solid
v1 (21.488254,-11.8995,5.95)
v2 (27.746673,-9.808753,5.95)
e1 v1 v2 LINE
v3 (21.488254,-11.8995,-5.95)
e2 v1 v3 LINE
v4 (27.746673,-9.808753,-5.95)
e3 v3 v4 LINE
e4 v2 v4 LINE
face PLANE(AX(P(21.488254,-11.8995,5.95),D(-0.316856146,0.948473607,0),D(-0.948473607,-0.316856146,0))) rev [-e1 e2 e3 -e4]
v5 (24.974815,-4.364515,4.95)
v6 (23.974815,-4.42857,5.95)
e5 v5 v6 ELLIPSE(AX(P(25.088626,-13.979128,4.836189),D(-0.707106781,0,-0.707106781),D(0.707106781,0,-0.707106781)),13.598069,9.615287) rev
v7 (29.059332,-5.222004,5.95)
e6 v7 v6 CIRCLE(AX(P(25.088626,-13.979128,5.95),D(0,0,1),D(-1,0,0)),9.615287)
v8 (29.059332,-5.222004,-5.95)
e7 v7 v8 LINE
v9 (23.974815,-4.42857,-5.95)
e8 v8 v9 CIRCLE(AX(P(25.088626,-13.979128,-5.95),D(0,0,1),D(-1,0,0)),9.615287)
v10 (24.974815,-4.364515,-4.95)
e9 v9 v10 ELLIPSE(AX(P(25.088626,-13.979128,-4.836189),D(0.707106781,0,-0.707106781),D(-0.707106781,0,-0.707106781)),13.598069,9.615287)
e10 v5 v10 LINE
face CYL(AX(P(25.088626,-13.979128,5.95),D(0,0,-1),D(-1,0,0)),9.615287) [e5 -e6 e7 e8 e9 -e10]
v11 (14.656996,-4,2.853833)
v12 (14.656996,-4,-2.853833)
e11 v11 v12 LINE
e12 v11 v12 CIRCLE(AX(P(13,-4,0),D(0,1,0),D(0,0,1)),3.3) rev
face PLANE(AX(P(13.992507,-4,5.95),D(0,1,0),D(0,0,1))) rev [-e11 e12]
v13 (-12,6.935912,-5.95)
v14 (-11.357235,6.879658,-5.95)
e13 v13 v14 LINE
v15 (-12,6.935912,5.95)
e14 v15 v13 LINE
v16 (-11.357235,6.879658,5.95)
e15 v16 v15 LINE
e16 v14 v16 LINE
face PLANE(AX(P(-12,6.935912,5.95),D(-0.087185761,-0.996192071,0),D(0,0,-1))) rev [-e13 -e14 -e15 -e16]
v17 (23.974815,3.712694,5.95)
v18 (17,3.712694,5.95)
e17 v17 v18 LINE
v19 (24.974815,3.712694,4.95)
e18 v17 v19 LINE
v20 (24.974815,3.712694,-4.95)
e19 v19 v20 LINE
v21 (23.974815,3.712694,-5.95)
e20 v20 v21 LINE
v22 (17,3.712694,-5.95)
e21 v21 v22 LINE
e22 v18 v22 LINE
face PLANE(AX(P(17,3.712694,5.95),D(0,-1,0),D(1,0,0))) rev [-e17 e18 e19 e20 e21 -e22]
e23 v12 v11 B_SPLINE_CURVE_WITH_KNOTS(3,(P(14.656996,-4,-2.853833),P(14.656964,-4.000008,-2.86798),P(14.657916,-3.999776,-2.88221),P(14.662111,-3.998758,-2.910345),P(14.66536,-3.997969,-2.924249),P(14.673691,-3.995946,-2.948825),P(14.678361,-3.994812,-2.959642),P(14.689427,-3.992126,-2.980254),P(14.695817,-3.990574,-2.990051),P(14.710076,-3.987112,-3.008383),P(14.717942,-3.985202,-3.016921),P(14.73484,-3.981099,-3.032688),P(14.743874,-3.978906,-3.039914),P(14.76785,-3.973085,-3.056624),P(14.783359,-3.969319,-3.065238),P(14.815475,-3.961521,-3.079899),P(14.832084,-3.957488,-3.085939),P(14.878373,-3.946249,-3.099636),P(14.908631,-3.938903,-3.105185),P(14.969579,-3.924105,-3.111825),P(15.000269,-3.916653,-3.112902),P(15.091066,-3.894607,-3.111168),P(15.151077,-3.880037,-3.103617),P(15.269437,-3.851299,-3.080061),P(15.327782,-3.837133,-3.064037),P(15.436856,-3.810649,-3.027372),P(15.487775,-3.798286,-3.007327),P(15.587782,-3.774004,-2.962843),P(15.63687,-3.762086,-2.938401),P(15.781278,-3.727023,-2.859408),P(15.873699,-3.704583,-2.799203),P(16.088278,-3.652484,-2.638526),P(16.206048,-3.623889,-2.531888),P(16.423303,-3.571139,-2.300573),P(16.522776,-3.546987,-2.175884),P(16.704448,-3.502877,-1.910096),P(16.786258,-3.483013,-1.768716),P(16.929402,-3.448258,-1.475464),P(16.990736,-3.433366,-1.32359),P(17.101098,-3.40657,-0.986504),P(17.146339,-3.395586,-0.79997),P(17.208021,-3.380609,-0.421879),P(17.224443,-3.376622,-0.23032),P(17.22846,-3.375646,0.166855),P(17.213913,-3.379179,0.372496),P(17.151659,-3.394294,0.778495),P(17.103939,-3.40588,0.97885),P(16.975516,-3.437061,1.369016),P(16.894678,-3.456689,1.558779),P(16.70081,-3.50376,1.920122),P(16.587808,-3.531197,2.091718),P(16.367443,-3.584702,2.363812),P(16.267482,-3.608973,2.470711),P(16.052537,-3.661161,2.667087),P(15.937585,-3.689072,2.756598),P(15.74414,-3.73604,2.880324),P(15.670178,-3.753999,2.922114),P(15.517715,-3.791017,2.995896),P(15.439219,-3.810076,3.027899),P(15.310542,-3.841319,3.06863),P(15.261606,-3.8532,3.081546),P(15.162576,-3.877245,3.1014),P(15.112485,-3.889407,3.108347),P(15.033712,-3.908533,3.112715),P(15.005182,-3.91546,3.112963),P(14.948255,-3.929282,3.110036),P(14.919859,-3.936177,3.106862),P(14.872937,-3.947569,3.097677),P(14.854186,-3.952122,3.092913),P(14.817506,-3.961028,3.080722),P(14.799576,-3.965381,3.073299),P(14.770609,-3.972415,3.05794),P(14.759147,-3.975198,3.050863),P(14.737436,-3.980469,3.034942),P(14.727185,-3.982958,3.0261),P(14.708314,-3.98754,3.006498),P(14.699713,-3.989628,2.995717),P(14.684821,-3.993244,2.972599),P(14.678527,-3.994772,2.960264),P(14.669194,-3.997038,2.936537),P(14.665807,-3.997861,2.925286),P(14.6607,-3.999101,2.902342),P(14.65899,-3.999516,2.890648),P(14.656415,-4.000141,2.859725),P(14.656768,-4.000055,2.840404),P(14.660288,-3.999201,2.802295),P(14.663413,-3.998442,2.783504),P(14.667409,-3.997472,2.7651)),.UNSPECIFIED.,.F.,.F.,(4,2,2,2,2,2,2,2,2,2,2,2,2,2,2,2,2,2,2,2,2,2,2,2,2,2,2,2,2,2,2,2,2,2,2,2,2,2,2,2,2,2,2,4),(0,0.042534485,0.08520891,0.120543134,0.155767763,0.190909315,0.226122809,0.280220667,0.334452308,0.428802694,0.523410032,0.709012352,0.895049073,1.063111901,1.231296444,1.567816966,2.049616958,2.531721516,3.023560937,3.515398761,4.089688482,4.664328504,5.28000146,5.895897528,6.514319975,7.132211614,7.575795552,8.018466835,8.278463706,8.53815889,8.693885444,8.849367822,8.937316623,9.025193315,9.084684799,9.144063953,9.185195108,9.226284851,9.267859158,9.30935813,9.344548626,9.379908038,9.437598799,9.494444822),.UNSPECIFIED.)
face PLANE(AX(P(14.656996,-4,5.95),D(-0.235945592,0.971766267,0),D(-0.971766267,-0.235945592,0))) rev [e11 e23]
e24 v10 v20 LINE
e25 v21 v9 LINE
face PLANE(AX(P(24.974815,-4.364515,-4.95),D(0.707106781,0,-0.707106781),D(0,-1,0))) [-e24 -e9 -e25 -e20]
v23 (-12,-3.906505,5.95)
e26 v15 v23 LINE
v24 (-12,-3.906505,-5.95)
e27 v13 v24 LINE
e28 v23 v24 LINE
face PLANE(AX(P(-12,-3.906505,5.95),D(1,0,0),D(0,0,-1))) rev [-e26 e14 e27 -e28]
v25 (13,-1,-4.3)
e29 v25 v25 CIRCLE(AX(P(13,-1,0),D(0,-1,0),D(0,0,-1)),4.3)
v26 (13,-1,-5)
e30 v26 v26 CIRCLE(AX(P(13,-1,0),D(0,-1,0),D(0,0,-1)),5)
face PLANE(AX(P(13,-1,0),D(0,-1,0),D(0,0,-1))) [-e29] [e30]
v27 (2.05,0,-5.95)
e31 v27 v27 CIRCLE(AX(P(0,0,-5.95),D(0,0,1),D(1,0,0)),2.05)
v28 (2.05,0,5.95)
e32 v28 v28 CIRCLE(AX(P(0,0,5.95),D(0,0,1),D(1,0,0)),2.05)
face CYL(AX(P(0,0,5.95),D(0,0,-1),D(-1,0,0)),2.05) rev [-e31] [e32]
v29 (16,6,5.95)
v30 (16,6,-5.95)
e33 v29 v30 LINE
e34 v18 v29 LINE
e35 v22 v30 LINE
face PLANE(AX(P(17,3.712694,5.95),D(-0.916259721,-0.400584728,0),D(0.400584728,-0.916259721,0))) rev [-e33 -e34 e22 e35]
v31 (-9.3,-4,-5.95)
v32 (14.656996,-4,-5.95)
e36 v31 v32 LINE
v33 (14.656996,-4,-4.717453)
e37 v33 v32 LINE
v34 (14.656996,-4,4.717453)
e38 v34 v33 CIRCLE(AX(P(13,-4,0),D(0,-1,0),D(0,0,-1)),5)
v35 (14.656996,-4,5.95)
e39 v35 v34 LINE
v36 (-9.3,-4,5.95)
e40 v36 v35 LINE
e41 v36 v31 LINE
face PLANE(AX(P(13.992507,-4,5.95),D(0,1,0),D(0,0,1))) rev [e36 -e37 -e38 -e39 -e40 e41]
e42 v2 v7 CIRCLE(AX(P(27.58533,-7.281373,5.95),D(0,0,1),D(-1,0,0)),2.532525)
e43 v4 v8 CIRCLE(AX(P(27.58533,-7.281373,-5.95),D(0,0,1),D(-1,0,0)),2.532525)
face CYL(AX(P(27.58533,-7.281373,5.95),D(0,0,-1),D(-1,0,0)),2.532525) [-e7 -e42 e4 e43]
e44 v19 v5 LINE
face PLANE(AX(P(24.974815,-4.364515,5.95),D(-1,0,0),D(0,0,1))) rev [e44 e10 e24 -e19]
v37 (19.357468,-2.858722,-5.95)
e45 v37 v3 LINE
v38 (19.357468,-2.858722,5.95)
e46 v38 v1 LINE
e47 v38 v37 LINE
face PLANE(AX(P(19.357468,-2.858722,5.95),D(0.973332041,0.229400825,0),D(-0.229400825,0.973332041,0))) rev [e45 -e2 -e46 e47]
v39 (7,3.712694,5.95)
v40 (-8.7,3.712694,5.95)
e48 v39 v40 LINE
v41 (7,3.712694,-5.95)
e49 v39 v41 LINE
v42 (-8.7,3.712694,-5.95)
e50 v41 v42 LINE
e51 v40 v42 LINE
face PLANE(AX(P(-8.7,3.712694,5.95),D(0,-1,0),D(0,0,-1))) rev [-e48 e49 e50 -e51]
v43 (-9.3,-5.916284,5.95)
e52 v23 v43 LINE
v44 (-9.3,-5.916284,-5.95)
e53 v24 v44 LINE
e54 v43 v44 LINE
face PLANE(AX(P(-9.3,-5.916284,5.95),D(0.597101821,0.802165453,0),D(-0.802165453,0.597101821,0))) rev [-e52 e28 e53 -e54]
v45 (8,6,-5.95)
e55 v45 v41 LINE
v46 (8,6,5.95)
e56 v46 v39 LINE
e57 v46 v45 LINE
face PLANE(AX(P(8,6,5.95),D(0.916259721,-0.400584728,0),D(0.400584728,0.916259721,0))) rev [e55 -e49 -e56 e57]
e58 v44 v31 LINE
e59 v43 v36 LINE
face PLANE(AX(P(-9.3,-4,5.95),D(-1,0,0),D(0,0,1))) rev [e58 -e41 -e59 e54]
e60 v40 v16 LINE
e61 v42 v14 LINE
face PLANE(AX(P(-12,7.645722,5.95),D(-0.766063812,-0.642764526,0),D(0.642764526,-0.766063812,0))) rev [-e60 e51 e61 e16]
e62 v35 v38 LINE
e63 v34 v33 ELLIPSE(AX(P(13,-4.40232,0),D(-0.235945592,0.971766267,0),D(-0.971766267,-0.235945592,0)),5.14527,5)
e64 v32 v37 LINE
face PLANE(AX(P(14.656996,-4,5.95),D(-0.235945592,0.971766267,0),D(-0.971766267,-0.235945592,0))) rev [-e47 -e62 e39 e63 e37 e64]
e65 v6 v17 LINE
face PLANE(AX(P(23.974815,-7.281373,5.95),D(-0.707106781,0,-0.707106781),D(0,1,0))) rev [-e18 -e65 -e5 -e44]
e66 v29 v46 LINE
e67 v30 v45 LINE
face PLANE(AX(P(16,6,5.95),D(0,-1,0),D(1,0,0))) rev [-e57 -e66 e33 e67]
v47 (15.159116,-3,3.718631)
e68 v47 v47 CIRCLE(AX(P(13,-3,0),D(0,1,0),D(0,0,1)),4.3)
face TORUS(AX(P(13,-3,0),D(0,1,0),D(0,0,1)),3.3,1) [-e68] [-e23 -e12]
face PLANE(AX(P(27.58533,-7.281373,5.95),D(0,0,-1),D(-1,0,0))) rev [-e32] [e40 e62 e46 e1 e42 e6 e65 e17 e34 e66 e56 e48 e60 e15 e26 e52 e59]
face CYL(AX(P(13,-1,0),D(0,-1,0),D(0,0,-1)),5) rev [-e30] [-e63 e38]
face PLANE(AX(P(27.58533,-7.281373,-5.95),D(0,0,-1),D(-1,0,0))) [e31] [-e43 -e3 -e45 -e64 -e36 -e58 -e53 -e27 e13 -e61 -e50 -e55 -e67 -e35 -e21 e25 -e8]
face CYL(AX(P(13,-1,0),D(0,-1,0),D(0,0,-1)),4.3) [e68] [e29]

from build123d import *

# Parameters (mm, degrees)
SKETCH_1_R          = 2.05
EXTRUDE_1_DEPTH     = 5.95
SKETCH_2_R          = 5
SKETCH_2_R_2        = 4.3
CUT_EXTRUDE_1_DEPTH = 3
FILLET_1_R          = 1
CHAMFER_2_SIZE      = 1
CHAMFER_3_SIZE      = 1
CHAMFER_3_SIZE2     = 0.709809686


with BuildPart() as part:
    # 스케치1 → 보스-돌출1 (new, symmetric)
    with BuildSketch(Plane.XY):
        with BuildLine():
            Line((-9.3, -4), (-9.3, -5.916283943))
            Line((-9.3, -5.916283943), (-12, -3.906505398))
            Line((-12, -3.906505398), (-12, 4.145721859))
            Line((-12, 4.145721859), (-12, 7.645721859))
            Line((-12, 7.645721859), (-8.7, 3.712694326))
            Line((-8.7, 3.712694326), (7, 3.712694326))
            Line((7, 3.712694326), (8, 6))
            Line((8, 6), (16, 6))
            Line((16, 6), (17, 3.712694326))
            Line((17, 3.712694326), (20, 3.712694326))
            Line((20, 3.712694326), (24.97481487, 3.712694326))
            Line((24.97481487, 3.712694326), (24.97481487, -4.364515181))
            ThreePointArc((24.97481487, -4.364515181), (27.06415919, -4.568973756), (29.05933214, -5.222003534))
            ThreePointArc((29.05933214, -5.222003534), (30.020110844, -7.978170358), (27.746673373, -9.808753146))
            Line((27.746673373, -9.808753146), (21.488254287, -11.89950036))
            Line((21.488254287, -11.89950036), (19.357468482, -2.858721645))
            Line((19.357468482, -2.858721645), (14.656995804, -4))
            Line((14.656995804, -4), (13.992506615, -4))
            Line((13.992506615, -4), (-9.3, -4))
        make_face()
        Circle(SKETCH_1_R, mode=Mode.SUBTRACT)
    extrude(amount=EXTRUDE_1_DEPTH, both=True)

    # 스케치2 → 컷-돌출1 (cut)
    with BuildSketch(Plane.XZ.offset(4)):
        with Locations(Location((13, 0, 0), (0, 0, 270))):
            Circle(SKETCH_2_R)
        with Locations(Location((13, 0, 0), (0, 0, 270))):
            Circle(SKETCH_2_R_2, mode=Mode.SUBTRACT)
    extrude(amount=-CUT_EXTRUDE_1_DEPTH, mode=Mode.SUBTRACT)

    # 필렛1
    # the kernel refuses this fillet: 1 mm, written as the material it takes off along each edge
    with BuildSketch(Plane(origin=(13, -4, 0), x_dir=(0.9752421696657375, 0, -0.22113957245519109), z_dir=(-0.22113957245519109, 0, -0.9752421696657375))) as fillet_1_piece_1:
        with BuildLine():
            CenterArc((4.3 - FILLET_1_R, -FILLET_1_R), FILLET_1_R, 0, 90)
            Line((4.3 - FILLET_1_R, 0), (4.3 - FILLET_1_R, FILLET_1_R * 0.02))
            Line((4.3 - FILLET_1_R, FILLET_1_R * 0.02), (4.3 + FILLET_1_R * 0.02, FILLET_1_R * 0.02))
            Line((4.3 + FILLET_1_R * 0.02, FILLET_1_R * 0.02), (4.3 + FILLET_1_R * 0.02, -FILLET_1_R))
            Line((4.3 + FILLET_1_R * 0.02, -FILLET_1_R), (4.3, -FILLET_1_R))
        make_face()
    revolve(axis=Axis((13, -4, 0), (0, -1, 0)), revolution_arc=282.775974377, mode=Mode.SUBTRACT)
    with BuildSketch(Plane(origin=(13, -4, 0), x_dir=(0, 0, -1), z_dir=(-1, 0, 0))) as fillet_1_piece_2:
        with BuildLine():
            CenterArc((4.3 - FILLET_1_R, -FILLET_1_R), FILLET_1_R, 0, 90)
            Line((4.3 - FILLET_1_R, 0), (4.3 - FILLET_1_R, FILLET_1_R * 0.02))
            Line((4.3 - FILLET_1_R, FILLET_1_R * 0.02), (4.3 + FILLET_1_R * 0.02, FILLET_1_R * 0.02))
            Line((4.3 + FILLET_1_R * 0.02, FILLET_1_R * 0.02), (4.3 + FILLET_1_R * 0.02, -FILLET_1_R))
            Line((4.3 + FILLET_1_R * 0.02, -FILLET_1_R), (4.3, -FILLET_1_R))
        make_face()
    revolve(axis=Axis((13, -4, 0), (0, -1, 0)), revolution_arc=102.614973236, mode=Mode.SUBTRACT)

    # 모따기2
    chamfer_2_edges = [part.edges().sort_by_distance(p)[0] for p in [
        (24.97481487, -0.325910428, -5.95),
        (24.97481487, -0.325910428, 5.95),
    ]]
    chamfer(chamfer_2_edges, length=CHAMFER_2_SIZE)

    # 모따기3
    chamfer_3_edges = [part.edges().sort_by_distance(p)[0] for p in [
        (-12, 7.645721859, 0),
    ]]
    chamfer_3_side = [part.faces().sort_by_distance(p)[0] for p in [
        (-10.35, 5.679208093, 0),
    ]]
    chamfer(chamfer_3_edges, length=CHAMFER_3_SIZE, length2=CHAMFER_3_SIZE2, reference=chamfer_3_side[0])


solid = part.part
